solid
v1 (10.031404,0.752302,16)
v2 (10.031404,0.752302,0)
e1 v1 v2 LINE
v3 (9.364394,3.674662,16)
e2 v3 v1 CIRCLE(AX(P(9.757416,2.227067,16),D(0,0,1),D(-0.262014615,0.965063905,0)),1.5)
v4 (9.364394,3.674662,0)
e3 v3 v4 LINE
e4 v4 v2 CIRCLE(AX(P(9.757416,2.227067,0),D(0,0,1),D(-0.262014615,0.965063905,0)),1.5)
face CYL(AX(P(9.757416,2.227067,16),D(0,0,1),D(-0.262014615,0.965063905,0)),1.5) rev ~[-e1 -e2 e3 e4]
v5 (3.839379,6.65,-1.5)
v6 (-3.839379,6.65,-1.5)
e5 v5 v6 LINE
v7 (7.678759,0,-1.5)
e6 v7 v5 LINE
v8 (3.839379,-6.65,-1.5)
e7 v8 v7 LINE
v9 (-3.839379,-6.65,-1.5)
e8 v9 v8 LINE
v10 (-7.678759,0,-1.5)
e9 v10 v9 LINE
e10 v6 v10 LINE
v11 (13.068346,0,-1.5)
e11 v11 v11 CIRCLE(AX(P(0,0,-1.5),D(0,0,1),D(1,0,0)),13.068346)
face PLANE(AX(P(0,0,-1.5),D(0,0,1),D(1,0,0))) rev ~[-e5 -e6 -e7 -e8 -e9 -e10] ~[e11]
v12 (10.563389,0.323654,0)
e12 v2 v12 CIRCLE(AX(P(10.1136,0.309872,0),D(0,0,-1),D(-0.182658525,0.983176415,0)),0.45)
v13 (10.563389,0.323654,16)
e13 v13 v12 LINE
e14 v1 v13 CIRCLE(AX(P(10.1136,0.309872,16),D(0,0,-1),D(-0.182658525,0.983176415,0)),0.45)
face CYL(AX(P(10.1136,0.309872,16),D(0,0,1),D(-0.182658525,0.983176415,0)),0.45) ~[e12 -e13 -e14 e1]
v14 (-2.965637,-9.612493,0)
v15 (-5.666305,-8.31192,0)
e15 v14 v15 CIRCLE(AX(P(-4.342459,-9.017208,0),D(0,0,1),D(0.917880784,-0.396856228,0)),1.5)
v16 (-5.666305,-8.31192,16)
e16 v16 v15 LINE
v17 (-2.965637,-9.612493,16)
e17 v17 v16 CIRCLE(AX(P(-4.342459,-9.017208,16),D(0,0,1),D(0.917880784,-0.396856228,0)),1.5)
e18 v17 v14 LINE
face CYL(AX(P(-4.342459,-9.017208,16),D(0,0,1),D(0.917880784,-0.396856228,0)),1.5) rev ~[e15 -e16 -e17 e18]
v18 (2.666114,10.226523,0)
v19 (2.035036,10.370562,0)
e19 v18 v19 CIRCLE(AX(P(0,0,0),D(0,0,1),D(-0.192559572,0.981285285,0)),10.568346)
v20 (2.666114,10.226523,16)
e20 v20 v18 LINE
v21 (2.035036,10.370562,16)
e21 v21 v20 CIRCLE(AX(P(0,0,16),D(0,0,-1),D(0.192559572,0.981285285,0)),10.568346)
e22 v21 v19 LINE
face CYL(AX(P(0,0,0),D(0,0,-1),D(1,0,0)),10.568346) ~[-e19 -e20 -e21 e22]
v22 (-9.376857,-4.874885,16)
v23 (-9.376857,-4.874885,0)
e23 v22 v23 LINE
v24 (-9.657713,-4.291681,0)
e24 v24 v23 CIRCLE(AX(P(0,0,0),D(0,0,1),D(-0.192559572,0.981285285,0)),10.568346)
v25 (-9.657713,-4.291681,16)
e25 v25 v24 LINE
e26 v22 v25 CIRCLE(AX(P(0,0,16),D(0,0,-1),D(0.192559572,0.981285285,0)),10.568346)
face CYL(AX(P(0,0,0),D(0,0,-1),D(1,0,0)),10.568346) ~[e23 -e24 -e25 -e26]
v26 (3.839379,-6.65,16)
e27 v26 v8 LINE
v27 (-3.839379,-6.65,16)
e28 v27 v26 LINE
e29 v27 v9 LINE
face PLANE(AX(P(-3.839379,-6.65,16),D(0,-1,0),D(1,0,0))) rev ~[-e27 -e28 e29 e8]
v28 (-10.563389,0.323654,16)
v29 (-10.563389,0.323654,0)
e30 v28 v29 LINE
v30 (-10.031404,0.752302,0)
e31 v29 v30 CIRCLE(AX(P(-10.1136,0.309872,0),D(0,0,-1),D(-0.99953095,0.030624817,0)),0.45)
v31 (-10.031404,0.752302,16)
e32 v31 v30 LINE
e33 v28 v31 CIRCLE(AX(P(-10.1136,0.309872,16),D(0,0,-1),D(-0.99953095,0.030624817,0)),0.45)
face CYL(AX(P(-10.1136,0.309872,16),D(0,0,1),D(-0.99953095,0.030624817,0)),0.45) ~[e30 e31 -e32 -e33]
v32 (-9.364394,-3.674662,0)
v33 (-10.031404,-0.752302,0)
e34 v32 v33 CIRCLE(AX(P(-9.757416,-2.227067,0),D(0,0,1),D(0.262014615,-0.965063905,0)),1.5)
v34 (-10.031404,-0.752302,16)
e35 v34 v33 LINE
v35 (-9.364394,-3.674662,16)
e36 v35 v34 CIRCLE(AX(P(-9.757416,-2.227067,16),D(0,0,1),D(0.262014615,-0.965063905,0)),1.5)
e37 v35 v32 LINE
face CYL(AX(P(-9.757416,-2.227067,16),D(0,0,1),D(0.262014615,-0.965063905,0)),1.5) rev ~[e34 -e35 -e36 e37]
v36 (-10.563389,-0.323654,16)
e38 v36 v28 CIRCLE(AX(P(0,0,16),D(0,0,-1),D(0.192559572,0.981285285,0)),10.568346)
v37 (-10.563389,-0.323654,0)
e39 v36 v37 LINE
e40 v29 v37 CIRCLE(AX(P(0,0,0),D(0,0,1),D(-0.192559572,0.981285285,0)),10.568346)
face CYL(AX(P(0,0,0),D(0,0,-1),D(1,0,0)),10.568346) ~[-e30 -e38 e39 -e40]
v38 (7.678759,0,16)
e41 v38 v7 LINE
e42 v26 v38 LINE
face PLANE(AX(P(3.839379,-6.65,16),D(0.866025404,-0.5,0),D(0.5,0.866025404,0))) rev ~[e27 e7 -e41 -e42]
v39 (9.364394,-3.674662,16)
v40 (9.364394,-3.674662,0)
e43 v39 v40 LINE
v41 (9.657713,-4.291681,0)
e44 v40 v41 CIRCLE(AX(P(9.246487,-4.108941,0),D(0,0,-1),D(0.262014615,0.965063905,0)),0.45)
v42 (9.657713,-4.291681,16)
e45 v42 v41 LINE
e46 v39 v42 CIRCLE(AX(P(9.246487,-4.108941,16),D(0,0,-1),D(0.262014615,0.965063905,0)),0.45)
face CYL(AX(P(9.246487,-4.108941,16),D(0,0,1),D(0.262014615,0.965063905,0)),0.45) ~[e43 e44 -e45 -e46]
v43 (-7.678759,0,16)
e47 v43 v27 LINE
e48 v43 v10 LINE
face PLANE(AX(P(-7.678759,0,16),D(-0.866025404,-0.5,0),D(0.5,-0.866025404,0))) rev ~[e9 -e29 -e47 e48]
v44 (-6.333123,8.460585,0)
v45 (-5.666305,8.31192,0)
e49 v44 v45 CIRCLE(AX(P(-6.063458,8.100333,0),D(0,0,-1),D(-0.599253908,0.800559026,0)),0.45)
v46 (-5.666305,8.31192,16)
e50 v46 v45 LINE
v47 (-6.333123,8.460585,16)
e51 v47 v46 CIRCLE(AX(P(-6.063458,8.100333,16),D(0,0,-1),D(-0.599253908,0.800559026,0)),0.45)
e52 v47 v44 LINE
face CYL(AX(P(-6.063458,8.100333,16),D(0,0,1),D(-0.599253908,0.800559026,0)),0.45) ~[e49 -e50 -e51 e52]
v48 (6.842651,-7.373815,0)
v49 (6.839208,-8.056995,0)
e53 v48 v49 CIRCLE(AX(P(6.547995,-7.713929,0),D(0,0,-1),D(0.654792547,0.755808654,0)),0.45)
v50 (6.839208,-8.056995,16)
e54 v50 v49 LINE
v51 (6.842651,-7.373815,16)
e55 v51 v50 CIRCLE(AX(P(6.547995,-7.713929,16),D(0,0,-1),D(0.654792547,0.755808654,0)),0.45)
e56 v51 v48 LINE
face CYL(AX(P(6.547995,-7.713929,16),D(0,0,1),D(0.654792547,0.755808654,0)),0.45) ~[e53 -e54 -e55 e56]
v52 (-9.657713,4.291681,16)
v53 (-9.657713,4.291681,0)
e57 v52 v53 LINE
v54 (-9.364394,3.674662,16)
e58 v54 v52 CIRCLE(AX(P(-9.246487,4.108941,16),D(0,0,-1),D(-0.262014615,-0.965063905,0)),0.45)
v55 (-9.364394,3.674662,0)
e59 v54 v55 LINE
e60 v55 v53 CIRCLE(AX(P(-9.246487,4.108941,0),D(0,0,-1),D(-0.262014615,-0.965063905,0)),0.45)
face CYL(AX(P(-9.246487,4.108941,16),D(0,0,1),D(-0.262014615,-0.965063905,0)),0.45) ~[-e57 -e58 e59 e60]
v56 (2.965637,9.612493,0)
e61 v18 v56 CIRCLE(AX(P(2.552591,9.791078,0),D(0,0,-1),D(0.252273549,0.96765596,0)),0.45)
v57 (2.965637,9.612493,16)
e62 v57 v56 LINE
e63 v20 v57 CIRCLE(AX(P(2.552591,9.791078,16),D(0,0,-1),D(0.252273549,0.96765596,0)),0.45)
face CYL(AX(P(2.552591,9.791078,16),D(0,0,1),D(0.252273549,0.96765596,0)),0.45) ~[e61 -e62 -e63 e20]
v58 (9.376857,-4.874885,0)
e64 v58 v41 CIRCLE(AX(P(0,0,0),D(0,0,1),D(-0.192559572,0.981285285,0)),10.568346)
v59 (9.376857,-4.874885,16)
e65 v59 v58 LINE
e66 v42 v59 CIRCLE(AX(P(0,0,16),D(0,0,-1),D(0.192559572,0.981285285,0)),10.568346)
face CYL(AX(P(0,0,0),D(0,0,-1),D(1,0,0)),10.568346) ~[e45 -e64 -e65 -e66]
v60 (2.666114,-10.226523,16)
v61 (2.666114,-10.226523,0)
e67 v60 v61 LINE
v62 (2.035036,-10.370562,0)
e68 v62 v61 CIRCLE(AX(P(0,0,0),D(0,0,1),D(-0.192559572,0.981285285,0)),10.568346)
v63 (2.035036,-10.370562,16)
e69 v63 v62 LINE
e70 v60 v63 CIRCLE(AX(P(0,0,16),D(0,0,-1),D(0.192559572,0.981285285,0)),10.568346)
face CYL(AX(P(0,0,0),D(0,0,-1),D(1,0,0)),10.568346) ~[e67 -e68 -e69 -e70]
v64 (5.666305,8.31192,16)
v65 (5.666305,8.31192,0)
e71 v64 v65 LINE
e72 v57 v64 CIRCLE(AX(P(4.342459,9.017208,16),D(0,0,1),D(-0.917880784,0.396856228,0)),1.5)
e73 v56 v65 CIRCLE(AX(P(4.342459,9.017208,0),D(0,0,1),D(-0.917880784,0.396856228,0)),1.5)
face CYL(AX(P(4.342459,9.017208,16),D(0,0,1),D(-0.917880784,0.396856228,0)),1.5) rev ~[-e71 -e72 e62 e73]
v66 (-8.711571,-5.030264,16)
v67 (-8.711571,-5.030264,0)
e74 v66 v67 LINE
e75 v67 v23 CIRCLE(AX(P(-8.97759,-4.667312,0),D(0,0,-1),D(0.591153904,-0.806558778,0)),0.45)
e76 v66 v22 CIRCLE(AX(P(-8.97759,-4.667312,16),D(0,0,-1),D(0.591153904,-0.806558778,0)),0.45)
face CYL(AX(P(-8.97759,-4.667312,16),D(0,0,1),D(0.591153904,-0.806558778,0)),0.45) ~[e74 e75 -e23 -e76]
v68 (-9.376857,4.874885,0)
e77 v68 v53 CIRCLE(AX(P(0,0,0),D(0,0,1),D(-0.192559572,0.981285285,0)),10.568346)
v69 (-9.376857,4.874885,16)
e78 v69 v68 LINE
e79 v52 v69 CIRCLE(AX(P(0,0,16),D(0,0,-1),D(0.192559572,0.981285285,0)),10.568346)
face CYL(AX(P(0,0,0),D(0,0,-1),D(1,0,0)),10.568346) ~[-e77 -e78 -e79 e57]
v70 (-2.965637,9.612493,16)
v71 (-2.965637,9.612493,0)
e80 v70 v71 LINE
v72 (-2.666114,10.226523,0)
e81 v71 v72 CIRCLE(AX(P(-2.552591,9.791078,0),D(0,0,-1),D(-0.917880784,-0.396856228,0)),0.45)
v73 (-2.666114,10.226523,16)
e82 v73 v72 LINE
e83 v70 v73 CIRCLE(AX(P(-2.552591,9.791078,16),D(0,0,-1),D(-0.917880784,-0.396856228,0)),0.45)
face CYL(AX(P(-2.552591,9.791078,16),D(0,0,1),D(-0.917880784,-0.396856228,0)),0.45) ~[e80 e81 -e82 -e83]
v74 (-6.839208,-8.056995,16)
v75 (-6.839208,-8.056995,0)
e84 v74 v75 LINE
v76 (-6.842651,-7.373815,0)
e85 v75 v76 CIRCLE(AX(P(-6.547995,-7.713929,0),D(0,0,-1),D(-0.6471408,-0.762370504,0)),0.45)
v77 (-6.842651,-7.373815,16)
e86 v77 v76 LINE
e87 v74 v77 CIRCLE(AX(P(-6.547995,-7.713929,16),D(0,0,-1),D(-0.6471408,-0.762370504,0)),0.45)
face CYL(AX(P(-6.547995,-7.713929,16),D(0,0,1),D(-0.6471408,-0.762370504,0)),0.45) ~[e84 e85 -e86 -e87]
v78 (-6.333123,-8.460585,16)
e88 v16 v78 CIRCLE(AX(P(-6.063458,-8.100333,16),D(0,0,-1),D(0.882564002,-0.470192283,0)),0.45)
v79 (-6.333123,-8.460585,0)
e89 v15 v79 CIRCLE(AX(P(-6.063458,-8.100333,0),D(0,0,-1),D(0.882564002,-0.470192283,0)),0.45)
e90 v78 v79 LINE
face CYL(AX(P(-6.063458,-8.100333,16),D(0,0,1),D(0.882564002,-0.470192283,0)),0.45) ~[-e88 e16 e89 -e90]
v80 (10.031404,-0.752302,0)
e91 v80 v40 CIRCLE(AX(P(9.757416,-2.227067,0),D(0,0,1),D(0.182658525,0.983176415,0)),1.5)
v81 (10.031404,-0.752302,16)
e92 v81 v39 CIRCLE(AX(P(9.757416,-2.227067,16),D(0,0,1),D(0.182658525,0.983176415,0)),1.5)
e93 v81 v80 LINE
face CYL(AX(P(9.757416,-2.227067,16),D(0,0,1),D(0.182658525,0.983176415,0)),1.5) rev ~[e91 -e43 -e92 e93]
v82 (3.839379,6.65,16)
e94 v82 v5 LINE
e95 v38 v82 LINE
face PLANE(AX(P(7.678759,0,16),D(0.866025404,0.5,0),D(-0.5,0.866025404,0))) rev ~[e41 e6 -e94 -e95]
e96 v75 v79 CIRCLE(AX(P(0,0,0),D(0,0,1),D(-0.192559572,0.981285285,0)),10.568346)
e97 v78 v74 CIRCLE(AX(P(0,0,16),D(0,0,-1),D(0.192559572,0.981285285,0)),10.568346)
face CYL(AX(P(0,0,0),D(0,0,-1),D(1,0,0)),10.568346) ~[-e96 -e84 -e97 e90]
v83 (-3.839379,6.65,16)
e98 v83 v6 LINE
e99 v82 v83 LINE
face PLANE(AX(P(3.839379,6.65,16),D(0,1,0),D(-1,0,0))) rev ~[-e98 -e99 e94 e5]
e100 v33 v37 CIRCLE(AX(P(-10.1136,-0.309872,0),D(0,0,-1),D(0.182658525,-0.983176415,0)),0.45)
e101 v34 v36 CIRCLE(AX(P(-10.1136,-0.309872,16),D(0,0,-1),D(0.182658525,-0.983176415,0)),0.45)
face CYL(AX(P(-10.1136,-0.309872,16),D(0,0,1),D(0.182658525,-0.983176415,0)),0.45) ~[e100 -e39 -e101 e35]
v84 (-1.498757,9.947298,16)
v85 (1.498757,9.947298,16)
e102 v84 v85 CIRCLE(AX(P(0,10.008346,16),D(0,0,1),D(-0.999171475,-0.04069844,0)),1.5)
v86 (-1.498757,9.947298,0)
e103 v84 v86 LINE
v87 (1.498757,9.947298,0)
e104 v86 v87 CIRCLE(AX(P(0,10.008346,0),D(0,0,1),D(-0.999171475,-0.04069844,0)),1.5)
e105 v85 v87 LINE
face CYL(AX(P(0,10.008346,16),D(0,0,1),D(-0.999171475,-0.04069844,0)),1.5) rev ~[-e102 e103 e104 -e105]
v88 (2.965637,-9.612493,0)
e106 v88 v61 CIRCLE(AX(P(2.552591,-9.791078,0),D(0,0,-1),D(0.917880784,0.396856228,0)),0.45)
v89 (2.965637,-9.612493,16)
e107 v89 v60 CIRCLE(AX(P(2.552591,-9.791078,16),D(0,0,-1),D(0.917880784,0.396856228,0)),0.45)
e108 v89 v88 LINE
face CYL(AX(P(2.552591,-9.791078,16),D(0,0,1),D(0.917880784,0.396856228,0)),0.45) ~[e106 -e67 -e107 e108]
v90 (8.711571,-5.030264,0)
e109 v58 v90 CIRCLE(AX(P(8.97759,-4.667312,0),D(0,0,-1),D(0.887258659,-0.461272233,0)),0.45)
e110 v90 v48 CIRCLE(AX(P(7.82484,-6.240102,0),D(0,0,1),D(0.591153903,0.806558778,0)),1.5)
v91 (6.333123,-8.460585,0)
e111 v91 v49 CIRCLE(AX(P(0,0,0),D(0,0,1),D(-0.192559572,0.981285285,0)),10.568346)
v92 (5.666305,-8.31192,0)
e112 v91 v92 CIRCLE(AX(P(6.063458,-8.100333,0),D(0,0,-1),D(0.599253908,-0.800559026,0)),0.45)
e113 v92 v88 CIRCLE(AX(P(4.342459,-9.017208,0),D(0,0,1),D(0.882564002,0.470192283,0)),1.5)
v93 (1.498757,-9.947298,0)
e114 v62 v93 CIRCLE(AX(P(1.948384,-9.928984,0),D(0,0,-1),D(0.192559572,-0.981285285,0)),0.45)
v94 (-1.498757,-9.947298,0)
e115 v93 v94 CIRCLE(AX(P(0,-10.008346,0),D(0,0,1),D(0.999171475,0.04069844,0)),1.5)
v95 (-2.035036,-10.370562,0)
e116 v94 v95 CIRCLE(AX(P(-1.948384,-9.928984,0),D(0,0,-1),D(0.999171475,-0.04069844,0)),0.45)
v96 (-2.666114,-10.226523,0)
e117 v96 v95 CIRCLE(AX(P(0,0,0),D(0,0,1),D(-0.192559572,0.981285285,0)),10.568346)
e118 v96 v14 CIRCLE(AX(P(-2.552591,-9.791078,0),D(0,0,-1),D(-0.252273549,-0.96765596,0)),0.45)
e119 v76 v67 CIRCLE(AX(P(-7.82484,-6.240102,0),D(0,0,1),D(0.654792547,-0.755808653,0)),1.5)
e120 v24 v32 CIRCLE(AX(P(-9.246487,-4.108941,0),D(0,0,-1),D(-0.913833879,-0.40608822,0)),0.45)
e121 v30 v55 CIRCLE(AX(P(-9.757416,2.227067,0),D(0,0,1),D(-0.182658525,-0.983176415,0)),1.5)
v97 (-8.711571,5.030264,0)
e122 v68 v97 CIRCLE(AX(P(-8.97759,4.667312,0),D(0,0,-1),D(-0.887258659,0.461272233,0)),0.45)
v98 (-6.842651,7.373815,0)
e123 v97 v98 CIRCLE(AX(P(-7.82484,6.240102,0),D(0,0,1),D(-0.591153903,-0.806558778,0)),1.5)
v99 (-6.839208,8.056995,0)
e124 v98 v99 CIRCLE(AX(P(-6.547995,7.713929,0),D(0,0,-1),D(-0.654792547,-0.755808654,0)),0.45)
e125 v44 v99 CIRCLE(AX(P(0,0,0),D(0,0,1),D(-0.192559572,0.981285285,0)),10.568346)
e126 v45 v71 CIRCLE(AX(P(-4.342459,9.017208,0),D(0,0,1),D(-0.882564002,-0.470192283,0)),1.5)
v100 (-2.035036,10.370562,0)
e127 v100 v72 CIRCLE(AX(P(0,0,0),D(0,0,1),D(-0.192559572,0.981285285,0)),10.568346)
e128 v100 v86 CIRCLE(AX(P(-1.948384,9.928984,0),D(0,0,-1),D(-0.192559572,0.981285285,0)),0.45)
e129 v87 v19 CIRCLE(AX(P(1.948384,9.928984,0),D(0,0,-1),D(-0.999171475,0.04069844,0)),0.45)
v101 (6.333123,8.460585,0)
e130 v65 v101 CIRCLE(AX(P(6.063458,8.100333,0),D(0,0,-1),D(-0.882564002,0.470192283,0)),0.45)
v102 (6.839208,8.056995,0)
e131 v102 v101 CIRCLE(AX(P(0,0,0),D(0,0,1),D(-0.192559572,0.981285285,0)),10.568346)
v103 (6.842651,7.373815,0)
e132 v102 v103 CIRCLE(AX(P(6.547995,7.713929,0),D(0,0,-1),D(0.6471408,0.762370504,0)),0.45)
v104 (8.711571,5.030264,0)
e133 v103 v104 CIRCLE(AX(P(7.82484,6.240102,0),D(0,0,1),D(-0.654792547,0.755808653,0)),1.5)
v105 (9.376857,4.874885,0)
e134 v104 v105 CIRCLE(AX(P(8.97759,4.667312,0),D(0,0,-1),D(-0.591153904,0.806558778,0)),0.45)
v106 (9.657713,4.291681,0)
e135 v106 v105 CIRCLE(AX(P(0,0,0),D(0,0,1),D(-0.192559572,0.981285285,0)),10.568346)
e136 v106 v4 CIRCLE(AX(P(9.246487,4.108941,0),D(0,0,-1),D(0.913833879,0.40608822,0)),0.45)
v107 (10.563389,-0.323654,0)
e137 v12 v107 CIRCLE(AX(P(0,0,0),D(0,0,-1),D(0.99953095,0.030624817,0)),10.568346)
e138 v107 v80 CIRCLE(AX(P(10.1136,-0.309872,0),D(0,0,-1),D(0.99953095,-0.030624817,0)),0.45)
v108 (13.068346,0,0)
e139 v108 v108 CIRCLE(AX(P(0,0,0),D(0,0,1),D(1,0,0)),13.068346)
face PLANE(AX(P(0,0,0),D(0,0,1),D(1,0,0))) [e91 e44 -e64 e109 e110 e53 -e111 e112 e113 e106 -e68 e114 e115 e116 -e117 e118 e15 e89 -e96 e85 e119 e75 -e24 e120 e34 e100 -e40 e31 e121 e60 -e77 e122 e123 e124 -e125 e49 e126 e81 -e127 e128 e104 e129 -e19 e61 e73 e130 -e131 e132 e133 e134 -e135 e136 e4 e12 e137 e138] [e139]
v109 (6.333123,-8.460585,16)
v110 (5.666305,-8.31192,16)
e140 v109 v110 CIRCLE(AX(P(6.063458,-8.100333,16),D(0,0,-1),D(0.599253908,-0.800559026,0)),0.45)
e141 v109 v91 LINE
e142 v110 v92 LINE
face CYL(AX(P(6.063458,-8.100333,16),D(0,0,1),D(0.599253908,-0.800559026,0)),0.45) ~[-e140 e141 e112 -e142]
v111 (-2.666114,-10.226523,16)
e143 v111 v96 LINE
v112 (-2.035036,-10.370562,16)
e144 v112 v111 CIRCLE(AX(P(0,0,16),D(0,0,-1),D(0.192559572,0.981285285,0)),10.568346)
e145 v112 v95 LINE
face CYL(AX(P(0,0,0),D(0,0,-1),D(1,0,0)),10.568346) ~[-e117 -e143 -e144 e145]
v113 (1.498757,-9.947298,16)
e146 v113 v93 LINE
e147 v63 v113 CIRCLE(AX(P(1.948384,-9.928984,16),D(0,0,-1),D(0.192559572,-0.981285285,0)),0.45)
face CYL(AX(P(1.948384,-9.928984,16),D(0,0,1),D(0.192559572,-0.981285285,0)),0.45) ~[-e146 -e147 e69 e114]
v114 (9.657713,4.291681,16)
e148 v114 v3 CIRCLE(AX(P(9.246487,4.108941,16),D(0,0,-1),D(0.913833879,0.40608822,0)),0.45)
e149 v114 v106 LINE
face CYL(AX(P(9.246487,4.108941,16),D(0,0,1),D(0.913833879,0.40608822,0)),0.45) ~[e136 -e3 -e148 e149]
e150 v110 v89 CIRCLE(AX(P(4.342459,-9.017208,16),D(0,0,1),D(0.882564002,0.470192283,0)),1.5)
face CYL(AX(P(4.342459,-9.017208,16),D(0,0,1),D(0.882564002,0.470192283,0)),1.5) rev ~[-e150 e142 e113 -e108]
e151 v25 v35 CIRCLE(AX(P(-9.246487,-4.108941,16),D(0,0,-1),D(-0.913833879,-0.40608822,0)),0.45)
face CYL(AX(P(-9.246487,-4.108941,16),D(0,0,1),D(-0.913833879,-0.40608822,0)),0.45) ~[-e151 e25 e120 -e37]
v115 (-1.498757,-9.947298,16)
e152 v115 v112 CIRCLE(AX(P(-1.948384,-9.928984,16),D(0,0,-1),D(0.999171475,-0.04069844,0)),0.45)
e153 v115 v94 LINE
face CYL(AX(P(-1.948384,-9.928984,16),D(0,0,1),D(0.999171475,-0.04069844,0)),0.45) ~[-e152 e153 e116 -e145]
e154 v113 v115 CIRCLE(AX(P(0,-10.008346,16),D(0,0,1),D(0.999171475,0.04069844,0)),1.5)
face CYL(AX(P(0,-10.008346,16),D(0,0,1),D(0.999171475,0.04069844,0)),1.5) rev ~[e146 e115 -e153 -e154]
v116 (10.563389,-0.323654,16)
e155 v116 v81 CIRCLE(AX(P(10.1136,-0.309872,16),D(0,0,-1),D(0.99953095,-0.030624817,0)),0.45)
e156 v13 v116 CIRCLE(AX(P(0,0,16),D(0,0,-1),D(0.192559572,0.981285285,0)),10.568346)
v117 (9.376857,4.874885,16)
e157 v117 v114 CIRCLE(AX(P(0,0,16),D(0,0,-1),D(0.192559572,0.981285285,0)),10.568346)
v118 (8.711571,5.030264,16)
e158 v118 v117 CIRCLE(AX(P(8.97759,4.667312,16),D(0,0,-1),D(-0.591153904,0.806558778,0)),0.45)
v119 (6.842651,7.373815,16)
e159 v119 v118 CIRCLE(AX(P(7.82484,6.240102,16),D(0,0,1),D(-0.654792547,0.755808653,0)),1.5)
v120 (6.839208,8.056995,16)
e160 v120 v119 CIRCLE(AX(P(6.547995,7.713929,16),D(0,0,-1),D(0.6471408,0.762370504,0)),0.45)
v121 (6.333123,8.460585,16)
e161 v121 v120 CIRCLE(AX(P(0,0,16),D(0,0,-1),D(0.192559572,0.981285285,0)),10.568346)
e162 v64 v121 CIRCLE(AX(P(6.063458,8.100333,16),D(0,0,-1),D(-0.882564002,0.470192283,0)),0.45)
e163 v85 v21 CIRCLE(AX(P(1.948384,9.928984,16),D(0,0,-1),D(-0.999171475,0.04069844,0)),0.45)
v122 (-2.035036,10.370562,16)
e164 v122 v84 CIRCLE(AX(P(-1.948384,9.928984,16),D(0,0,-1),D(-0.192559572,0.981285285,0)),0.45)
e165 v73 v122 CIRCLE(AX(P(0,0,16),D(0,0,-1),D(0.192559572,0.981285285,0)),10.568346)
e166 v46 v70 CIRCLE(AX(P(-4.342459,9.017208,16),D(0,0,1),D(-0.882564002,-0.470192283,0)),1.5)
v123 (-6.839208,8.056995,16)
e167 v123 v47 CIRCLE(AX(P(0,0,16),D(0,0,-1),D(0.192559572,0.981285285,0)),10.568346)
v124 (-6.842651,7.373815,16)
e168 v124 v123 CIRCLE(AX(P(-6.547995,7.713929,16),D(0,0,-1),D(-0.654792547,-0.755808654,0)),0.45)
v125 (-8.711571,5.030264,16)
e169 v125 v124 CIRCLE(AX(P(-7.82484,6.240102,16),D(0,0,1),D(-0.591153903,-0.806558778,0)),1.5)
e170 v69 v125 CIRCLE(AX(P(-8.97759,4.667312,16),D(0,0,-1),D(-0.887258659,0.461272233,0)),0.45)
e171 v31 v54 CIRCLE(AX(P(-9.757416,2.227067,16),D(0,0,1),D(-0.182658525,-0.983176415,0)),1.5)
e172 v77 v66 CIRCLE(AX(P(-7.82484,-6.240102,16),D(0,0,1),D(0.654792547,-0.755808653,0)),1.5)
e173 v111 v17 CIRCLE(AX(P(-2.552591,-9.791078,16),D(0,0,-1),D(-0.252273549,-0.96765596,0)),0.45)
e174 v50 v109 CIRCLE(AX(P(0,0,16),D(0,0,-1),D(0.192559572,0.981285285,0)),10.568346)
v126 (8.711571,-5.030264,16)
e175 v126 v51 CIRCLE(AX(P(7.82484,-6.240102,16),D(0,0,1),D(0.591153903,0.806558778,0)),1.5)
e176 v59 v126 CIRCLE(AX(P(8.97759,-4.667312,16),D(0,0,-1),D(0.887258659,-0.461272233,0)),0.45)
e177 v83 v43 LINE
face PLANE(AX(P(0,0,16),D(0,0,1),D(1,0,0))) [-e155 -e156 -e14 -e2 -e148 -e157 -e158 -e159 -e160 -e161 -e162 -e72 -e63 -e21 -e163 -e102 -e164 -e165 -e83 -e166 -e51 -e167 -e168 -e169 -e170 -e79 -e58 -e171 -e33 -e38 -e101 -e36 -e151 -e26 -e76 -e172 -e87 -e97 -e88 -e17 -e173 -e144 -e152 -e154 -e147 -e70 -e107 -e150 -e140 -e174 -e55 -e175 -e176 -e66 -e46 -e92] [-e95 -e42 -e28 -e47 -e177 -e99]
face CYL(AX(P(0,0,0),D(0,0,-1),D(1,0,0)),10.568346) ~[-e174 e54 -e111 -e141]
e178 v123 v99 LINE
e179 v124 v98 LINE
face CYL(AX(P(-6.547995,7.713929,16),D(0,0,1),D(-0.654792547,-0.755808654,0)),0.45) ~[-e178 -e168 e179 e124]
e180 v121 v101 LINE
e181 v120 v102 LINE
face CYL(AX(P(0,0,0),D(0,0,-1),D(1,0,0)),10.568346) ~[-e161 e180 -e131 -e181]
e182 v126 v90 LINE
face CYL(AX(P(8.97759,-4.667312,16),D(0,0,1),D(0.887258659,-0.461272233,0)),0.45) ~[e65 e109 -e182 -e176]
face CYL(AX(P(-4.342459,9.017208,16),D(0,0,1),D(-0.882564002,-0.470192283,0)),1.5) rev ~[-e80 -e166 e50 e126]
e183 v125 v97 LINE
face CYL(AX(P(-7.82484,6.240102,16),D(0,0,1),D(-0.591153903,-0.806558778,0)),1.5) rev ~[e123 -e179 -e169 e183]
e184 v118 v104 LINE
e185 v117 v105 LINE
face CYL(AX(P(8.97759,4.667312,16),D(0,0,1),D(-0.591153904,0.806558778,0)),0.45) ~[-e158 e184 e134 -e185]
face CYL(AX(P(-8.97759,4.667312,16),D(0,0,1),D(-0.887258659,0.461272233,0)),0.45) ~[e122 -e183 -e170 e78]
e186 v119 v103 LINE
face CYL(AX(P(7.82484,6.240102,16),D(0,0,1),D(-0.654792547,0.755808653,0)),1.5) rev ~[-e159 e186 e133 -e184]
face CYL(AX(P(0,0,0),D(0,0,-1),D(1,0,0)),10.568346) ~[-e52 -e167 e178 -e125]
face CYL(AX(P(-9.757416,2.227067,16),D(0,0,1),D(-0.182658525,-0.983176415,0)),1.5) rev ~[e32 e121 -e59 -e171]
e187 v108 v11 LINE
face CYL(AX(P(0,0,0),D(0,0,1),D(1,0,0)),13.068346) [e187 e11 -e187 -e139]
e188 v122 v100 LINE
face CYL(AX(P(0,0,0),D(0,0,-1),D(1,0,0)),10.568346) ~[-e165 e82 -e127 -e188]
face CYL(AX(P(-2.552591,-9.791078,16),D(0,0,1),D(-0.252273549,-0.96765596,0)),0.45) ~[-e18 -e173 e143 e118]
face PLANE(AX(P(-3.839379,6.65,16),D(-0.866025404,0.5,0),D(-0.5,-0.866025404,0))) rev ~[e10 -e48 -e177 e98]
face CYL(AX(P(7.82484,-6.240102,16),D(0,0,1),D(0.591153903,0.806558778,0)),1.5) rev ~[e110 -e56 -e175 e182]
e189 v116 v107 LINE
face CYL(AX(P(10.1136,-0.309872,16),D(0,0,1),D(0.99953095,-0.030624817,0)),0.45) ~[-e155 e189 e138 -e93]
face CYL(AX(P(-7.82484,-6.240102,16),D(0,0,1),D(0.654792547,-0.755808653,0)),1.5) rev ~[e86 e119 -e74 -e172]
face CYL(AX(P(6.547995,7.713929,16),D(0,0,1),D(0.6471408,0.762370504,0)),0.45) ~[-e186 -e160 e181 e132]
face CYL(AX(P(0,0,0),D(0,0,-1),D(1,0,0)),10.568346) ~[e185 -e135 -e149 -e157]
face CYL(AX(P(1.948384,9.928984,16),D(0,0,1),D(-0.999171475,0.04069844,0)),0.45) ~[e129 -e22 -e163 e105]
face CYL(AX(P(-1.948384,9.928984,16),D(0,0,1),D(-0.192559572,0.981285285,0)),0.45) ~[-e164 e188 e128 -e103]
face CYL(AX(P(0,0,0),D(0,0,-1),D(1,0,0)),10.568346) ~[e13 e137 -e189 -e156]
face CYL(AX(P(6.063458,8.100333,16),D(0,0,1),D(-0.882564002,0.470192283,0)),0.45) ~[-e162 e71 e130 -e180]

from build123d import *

# Parameters (mm, degrees)
F2_R            = 10.5683460292
F3_DEPTH        = 16
F5_DEPTH        = 16
F5_COPIES_COUNT = 14
F8_R            = 13.0683460292
F8_R_2          = 10.5683460292
F9_DEPTH        = 1.5
F10_DEPTH       = 17.501


# Not quite as in the source:
# - a feature of the source that left no trace in its solid (it failed there, or was rolled back) is left out
# - a pattern or mirror of a feature is missing from the dataset's text; its kind, count and spacing are read off the source's solid


with BuildPart() as f3:
    # F2 (on Top) → F3 (new body)
    with BuildSketch(Plane.XY):
        Circle(F2_R)
    extrude(amount=F3_DEPTH)

    # F4 (on face) → F5 (cut, through all)
    with BuildSketch(Plane.XY.offset(16)):
        with BuildLine():
            ThreePointArc((-2.035036184, 10.3705624496), (-1.6695907294, 10.2822178496), (-1.4987572129, 9.9472983692))
            ThreePointArc((-1.4987572129, 9.9472983692), (0, 8.5083460292), (1.4987572129, 9.9472983692))
            ThreePointArc((1.4987572129, 9.9472983692), (1.6695907294, 10.2822178496), (2.035036184, 10.3705624496))
            ThreePointArc((2.035036184, 10.3705624496), (0, 10.5683460292), (-2.035036184, 10.3705624496))
        make_face()
    f5 = extrude(amount=-F5_DEPTH, mode=Mode.SUBTRACT)

    # F5_copies: F5 ×14 about axis
    f5_copies_axis = Axis((0, 0, 0), (0, 0, 1))
    for i in range(1, F5_COPIES_COUNT):
        add(f5.rotate(f5_copies_axis, i * 360 / F5_COPIES_COUNT), mode=Mode.SUBTRACT)

    # F8 (on face) + F2 (on Top) → F9 (join)
    with BuildSketch(Plane.XY):
        Circle(F8_R)
        Circle(F8_R_2, mode=Mode.SUBTRACT)
    with BuildSketch(Plane.XY):
        Circle(F2_R)
    extrude(amount=-F9_DEPTH)

    # F7 (on face) → F10 (cut, through all)
    with BuildSketch(Plane.XY.offset(16)):
        Polygon((3.8393792901, 6.65), (-3.8393792901, 6.65), (-7.6787585802, 0), (-3.8393792901, -6.65), (3.8393792901, -6.65), (7.6787585802, 0), align=None)
    extrude(amount=-F10_DEPTH, mode=Mode.SUBTRACT)


solid = f3.part
